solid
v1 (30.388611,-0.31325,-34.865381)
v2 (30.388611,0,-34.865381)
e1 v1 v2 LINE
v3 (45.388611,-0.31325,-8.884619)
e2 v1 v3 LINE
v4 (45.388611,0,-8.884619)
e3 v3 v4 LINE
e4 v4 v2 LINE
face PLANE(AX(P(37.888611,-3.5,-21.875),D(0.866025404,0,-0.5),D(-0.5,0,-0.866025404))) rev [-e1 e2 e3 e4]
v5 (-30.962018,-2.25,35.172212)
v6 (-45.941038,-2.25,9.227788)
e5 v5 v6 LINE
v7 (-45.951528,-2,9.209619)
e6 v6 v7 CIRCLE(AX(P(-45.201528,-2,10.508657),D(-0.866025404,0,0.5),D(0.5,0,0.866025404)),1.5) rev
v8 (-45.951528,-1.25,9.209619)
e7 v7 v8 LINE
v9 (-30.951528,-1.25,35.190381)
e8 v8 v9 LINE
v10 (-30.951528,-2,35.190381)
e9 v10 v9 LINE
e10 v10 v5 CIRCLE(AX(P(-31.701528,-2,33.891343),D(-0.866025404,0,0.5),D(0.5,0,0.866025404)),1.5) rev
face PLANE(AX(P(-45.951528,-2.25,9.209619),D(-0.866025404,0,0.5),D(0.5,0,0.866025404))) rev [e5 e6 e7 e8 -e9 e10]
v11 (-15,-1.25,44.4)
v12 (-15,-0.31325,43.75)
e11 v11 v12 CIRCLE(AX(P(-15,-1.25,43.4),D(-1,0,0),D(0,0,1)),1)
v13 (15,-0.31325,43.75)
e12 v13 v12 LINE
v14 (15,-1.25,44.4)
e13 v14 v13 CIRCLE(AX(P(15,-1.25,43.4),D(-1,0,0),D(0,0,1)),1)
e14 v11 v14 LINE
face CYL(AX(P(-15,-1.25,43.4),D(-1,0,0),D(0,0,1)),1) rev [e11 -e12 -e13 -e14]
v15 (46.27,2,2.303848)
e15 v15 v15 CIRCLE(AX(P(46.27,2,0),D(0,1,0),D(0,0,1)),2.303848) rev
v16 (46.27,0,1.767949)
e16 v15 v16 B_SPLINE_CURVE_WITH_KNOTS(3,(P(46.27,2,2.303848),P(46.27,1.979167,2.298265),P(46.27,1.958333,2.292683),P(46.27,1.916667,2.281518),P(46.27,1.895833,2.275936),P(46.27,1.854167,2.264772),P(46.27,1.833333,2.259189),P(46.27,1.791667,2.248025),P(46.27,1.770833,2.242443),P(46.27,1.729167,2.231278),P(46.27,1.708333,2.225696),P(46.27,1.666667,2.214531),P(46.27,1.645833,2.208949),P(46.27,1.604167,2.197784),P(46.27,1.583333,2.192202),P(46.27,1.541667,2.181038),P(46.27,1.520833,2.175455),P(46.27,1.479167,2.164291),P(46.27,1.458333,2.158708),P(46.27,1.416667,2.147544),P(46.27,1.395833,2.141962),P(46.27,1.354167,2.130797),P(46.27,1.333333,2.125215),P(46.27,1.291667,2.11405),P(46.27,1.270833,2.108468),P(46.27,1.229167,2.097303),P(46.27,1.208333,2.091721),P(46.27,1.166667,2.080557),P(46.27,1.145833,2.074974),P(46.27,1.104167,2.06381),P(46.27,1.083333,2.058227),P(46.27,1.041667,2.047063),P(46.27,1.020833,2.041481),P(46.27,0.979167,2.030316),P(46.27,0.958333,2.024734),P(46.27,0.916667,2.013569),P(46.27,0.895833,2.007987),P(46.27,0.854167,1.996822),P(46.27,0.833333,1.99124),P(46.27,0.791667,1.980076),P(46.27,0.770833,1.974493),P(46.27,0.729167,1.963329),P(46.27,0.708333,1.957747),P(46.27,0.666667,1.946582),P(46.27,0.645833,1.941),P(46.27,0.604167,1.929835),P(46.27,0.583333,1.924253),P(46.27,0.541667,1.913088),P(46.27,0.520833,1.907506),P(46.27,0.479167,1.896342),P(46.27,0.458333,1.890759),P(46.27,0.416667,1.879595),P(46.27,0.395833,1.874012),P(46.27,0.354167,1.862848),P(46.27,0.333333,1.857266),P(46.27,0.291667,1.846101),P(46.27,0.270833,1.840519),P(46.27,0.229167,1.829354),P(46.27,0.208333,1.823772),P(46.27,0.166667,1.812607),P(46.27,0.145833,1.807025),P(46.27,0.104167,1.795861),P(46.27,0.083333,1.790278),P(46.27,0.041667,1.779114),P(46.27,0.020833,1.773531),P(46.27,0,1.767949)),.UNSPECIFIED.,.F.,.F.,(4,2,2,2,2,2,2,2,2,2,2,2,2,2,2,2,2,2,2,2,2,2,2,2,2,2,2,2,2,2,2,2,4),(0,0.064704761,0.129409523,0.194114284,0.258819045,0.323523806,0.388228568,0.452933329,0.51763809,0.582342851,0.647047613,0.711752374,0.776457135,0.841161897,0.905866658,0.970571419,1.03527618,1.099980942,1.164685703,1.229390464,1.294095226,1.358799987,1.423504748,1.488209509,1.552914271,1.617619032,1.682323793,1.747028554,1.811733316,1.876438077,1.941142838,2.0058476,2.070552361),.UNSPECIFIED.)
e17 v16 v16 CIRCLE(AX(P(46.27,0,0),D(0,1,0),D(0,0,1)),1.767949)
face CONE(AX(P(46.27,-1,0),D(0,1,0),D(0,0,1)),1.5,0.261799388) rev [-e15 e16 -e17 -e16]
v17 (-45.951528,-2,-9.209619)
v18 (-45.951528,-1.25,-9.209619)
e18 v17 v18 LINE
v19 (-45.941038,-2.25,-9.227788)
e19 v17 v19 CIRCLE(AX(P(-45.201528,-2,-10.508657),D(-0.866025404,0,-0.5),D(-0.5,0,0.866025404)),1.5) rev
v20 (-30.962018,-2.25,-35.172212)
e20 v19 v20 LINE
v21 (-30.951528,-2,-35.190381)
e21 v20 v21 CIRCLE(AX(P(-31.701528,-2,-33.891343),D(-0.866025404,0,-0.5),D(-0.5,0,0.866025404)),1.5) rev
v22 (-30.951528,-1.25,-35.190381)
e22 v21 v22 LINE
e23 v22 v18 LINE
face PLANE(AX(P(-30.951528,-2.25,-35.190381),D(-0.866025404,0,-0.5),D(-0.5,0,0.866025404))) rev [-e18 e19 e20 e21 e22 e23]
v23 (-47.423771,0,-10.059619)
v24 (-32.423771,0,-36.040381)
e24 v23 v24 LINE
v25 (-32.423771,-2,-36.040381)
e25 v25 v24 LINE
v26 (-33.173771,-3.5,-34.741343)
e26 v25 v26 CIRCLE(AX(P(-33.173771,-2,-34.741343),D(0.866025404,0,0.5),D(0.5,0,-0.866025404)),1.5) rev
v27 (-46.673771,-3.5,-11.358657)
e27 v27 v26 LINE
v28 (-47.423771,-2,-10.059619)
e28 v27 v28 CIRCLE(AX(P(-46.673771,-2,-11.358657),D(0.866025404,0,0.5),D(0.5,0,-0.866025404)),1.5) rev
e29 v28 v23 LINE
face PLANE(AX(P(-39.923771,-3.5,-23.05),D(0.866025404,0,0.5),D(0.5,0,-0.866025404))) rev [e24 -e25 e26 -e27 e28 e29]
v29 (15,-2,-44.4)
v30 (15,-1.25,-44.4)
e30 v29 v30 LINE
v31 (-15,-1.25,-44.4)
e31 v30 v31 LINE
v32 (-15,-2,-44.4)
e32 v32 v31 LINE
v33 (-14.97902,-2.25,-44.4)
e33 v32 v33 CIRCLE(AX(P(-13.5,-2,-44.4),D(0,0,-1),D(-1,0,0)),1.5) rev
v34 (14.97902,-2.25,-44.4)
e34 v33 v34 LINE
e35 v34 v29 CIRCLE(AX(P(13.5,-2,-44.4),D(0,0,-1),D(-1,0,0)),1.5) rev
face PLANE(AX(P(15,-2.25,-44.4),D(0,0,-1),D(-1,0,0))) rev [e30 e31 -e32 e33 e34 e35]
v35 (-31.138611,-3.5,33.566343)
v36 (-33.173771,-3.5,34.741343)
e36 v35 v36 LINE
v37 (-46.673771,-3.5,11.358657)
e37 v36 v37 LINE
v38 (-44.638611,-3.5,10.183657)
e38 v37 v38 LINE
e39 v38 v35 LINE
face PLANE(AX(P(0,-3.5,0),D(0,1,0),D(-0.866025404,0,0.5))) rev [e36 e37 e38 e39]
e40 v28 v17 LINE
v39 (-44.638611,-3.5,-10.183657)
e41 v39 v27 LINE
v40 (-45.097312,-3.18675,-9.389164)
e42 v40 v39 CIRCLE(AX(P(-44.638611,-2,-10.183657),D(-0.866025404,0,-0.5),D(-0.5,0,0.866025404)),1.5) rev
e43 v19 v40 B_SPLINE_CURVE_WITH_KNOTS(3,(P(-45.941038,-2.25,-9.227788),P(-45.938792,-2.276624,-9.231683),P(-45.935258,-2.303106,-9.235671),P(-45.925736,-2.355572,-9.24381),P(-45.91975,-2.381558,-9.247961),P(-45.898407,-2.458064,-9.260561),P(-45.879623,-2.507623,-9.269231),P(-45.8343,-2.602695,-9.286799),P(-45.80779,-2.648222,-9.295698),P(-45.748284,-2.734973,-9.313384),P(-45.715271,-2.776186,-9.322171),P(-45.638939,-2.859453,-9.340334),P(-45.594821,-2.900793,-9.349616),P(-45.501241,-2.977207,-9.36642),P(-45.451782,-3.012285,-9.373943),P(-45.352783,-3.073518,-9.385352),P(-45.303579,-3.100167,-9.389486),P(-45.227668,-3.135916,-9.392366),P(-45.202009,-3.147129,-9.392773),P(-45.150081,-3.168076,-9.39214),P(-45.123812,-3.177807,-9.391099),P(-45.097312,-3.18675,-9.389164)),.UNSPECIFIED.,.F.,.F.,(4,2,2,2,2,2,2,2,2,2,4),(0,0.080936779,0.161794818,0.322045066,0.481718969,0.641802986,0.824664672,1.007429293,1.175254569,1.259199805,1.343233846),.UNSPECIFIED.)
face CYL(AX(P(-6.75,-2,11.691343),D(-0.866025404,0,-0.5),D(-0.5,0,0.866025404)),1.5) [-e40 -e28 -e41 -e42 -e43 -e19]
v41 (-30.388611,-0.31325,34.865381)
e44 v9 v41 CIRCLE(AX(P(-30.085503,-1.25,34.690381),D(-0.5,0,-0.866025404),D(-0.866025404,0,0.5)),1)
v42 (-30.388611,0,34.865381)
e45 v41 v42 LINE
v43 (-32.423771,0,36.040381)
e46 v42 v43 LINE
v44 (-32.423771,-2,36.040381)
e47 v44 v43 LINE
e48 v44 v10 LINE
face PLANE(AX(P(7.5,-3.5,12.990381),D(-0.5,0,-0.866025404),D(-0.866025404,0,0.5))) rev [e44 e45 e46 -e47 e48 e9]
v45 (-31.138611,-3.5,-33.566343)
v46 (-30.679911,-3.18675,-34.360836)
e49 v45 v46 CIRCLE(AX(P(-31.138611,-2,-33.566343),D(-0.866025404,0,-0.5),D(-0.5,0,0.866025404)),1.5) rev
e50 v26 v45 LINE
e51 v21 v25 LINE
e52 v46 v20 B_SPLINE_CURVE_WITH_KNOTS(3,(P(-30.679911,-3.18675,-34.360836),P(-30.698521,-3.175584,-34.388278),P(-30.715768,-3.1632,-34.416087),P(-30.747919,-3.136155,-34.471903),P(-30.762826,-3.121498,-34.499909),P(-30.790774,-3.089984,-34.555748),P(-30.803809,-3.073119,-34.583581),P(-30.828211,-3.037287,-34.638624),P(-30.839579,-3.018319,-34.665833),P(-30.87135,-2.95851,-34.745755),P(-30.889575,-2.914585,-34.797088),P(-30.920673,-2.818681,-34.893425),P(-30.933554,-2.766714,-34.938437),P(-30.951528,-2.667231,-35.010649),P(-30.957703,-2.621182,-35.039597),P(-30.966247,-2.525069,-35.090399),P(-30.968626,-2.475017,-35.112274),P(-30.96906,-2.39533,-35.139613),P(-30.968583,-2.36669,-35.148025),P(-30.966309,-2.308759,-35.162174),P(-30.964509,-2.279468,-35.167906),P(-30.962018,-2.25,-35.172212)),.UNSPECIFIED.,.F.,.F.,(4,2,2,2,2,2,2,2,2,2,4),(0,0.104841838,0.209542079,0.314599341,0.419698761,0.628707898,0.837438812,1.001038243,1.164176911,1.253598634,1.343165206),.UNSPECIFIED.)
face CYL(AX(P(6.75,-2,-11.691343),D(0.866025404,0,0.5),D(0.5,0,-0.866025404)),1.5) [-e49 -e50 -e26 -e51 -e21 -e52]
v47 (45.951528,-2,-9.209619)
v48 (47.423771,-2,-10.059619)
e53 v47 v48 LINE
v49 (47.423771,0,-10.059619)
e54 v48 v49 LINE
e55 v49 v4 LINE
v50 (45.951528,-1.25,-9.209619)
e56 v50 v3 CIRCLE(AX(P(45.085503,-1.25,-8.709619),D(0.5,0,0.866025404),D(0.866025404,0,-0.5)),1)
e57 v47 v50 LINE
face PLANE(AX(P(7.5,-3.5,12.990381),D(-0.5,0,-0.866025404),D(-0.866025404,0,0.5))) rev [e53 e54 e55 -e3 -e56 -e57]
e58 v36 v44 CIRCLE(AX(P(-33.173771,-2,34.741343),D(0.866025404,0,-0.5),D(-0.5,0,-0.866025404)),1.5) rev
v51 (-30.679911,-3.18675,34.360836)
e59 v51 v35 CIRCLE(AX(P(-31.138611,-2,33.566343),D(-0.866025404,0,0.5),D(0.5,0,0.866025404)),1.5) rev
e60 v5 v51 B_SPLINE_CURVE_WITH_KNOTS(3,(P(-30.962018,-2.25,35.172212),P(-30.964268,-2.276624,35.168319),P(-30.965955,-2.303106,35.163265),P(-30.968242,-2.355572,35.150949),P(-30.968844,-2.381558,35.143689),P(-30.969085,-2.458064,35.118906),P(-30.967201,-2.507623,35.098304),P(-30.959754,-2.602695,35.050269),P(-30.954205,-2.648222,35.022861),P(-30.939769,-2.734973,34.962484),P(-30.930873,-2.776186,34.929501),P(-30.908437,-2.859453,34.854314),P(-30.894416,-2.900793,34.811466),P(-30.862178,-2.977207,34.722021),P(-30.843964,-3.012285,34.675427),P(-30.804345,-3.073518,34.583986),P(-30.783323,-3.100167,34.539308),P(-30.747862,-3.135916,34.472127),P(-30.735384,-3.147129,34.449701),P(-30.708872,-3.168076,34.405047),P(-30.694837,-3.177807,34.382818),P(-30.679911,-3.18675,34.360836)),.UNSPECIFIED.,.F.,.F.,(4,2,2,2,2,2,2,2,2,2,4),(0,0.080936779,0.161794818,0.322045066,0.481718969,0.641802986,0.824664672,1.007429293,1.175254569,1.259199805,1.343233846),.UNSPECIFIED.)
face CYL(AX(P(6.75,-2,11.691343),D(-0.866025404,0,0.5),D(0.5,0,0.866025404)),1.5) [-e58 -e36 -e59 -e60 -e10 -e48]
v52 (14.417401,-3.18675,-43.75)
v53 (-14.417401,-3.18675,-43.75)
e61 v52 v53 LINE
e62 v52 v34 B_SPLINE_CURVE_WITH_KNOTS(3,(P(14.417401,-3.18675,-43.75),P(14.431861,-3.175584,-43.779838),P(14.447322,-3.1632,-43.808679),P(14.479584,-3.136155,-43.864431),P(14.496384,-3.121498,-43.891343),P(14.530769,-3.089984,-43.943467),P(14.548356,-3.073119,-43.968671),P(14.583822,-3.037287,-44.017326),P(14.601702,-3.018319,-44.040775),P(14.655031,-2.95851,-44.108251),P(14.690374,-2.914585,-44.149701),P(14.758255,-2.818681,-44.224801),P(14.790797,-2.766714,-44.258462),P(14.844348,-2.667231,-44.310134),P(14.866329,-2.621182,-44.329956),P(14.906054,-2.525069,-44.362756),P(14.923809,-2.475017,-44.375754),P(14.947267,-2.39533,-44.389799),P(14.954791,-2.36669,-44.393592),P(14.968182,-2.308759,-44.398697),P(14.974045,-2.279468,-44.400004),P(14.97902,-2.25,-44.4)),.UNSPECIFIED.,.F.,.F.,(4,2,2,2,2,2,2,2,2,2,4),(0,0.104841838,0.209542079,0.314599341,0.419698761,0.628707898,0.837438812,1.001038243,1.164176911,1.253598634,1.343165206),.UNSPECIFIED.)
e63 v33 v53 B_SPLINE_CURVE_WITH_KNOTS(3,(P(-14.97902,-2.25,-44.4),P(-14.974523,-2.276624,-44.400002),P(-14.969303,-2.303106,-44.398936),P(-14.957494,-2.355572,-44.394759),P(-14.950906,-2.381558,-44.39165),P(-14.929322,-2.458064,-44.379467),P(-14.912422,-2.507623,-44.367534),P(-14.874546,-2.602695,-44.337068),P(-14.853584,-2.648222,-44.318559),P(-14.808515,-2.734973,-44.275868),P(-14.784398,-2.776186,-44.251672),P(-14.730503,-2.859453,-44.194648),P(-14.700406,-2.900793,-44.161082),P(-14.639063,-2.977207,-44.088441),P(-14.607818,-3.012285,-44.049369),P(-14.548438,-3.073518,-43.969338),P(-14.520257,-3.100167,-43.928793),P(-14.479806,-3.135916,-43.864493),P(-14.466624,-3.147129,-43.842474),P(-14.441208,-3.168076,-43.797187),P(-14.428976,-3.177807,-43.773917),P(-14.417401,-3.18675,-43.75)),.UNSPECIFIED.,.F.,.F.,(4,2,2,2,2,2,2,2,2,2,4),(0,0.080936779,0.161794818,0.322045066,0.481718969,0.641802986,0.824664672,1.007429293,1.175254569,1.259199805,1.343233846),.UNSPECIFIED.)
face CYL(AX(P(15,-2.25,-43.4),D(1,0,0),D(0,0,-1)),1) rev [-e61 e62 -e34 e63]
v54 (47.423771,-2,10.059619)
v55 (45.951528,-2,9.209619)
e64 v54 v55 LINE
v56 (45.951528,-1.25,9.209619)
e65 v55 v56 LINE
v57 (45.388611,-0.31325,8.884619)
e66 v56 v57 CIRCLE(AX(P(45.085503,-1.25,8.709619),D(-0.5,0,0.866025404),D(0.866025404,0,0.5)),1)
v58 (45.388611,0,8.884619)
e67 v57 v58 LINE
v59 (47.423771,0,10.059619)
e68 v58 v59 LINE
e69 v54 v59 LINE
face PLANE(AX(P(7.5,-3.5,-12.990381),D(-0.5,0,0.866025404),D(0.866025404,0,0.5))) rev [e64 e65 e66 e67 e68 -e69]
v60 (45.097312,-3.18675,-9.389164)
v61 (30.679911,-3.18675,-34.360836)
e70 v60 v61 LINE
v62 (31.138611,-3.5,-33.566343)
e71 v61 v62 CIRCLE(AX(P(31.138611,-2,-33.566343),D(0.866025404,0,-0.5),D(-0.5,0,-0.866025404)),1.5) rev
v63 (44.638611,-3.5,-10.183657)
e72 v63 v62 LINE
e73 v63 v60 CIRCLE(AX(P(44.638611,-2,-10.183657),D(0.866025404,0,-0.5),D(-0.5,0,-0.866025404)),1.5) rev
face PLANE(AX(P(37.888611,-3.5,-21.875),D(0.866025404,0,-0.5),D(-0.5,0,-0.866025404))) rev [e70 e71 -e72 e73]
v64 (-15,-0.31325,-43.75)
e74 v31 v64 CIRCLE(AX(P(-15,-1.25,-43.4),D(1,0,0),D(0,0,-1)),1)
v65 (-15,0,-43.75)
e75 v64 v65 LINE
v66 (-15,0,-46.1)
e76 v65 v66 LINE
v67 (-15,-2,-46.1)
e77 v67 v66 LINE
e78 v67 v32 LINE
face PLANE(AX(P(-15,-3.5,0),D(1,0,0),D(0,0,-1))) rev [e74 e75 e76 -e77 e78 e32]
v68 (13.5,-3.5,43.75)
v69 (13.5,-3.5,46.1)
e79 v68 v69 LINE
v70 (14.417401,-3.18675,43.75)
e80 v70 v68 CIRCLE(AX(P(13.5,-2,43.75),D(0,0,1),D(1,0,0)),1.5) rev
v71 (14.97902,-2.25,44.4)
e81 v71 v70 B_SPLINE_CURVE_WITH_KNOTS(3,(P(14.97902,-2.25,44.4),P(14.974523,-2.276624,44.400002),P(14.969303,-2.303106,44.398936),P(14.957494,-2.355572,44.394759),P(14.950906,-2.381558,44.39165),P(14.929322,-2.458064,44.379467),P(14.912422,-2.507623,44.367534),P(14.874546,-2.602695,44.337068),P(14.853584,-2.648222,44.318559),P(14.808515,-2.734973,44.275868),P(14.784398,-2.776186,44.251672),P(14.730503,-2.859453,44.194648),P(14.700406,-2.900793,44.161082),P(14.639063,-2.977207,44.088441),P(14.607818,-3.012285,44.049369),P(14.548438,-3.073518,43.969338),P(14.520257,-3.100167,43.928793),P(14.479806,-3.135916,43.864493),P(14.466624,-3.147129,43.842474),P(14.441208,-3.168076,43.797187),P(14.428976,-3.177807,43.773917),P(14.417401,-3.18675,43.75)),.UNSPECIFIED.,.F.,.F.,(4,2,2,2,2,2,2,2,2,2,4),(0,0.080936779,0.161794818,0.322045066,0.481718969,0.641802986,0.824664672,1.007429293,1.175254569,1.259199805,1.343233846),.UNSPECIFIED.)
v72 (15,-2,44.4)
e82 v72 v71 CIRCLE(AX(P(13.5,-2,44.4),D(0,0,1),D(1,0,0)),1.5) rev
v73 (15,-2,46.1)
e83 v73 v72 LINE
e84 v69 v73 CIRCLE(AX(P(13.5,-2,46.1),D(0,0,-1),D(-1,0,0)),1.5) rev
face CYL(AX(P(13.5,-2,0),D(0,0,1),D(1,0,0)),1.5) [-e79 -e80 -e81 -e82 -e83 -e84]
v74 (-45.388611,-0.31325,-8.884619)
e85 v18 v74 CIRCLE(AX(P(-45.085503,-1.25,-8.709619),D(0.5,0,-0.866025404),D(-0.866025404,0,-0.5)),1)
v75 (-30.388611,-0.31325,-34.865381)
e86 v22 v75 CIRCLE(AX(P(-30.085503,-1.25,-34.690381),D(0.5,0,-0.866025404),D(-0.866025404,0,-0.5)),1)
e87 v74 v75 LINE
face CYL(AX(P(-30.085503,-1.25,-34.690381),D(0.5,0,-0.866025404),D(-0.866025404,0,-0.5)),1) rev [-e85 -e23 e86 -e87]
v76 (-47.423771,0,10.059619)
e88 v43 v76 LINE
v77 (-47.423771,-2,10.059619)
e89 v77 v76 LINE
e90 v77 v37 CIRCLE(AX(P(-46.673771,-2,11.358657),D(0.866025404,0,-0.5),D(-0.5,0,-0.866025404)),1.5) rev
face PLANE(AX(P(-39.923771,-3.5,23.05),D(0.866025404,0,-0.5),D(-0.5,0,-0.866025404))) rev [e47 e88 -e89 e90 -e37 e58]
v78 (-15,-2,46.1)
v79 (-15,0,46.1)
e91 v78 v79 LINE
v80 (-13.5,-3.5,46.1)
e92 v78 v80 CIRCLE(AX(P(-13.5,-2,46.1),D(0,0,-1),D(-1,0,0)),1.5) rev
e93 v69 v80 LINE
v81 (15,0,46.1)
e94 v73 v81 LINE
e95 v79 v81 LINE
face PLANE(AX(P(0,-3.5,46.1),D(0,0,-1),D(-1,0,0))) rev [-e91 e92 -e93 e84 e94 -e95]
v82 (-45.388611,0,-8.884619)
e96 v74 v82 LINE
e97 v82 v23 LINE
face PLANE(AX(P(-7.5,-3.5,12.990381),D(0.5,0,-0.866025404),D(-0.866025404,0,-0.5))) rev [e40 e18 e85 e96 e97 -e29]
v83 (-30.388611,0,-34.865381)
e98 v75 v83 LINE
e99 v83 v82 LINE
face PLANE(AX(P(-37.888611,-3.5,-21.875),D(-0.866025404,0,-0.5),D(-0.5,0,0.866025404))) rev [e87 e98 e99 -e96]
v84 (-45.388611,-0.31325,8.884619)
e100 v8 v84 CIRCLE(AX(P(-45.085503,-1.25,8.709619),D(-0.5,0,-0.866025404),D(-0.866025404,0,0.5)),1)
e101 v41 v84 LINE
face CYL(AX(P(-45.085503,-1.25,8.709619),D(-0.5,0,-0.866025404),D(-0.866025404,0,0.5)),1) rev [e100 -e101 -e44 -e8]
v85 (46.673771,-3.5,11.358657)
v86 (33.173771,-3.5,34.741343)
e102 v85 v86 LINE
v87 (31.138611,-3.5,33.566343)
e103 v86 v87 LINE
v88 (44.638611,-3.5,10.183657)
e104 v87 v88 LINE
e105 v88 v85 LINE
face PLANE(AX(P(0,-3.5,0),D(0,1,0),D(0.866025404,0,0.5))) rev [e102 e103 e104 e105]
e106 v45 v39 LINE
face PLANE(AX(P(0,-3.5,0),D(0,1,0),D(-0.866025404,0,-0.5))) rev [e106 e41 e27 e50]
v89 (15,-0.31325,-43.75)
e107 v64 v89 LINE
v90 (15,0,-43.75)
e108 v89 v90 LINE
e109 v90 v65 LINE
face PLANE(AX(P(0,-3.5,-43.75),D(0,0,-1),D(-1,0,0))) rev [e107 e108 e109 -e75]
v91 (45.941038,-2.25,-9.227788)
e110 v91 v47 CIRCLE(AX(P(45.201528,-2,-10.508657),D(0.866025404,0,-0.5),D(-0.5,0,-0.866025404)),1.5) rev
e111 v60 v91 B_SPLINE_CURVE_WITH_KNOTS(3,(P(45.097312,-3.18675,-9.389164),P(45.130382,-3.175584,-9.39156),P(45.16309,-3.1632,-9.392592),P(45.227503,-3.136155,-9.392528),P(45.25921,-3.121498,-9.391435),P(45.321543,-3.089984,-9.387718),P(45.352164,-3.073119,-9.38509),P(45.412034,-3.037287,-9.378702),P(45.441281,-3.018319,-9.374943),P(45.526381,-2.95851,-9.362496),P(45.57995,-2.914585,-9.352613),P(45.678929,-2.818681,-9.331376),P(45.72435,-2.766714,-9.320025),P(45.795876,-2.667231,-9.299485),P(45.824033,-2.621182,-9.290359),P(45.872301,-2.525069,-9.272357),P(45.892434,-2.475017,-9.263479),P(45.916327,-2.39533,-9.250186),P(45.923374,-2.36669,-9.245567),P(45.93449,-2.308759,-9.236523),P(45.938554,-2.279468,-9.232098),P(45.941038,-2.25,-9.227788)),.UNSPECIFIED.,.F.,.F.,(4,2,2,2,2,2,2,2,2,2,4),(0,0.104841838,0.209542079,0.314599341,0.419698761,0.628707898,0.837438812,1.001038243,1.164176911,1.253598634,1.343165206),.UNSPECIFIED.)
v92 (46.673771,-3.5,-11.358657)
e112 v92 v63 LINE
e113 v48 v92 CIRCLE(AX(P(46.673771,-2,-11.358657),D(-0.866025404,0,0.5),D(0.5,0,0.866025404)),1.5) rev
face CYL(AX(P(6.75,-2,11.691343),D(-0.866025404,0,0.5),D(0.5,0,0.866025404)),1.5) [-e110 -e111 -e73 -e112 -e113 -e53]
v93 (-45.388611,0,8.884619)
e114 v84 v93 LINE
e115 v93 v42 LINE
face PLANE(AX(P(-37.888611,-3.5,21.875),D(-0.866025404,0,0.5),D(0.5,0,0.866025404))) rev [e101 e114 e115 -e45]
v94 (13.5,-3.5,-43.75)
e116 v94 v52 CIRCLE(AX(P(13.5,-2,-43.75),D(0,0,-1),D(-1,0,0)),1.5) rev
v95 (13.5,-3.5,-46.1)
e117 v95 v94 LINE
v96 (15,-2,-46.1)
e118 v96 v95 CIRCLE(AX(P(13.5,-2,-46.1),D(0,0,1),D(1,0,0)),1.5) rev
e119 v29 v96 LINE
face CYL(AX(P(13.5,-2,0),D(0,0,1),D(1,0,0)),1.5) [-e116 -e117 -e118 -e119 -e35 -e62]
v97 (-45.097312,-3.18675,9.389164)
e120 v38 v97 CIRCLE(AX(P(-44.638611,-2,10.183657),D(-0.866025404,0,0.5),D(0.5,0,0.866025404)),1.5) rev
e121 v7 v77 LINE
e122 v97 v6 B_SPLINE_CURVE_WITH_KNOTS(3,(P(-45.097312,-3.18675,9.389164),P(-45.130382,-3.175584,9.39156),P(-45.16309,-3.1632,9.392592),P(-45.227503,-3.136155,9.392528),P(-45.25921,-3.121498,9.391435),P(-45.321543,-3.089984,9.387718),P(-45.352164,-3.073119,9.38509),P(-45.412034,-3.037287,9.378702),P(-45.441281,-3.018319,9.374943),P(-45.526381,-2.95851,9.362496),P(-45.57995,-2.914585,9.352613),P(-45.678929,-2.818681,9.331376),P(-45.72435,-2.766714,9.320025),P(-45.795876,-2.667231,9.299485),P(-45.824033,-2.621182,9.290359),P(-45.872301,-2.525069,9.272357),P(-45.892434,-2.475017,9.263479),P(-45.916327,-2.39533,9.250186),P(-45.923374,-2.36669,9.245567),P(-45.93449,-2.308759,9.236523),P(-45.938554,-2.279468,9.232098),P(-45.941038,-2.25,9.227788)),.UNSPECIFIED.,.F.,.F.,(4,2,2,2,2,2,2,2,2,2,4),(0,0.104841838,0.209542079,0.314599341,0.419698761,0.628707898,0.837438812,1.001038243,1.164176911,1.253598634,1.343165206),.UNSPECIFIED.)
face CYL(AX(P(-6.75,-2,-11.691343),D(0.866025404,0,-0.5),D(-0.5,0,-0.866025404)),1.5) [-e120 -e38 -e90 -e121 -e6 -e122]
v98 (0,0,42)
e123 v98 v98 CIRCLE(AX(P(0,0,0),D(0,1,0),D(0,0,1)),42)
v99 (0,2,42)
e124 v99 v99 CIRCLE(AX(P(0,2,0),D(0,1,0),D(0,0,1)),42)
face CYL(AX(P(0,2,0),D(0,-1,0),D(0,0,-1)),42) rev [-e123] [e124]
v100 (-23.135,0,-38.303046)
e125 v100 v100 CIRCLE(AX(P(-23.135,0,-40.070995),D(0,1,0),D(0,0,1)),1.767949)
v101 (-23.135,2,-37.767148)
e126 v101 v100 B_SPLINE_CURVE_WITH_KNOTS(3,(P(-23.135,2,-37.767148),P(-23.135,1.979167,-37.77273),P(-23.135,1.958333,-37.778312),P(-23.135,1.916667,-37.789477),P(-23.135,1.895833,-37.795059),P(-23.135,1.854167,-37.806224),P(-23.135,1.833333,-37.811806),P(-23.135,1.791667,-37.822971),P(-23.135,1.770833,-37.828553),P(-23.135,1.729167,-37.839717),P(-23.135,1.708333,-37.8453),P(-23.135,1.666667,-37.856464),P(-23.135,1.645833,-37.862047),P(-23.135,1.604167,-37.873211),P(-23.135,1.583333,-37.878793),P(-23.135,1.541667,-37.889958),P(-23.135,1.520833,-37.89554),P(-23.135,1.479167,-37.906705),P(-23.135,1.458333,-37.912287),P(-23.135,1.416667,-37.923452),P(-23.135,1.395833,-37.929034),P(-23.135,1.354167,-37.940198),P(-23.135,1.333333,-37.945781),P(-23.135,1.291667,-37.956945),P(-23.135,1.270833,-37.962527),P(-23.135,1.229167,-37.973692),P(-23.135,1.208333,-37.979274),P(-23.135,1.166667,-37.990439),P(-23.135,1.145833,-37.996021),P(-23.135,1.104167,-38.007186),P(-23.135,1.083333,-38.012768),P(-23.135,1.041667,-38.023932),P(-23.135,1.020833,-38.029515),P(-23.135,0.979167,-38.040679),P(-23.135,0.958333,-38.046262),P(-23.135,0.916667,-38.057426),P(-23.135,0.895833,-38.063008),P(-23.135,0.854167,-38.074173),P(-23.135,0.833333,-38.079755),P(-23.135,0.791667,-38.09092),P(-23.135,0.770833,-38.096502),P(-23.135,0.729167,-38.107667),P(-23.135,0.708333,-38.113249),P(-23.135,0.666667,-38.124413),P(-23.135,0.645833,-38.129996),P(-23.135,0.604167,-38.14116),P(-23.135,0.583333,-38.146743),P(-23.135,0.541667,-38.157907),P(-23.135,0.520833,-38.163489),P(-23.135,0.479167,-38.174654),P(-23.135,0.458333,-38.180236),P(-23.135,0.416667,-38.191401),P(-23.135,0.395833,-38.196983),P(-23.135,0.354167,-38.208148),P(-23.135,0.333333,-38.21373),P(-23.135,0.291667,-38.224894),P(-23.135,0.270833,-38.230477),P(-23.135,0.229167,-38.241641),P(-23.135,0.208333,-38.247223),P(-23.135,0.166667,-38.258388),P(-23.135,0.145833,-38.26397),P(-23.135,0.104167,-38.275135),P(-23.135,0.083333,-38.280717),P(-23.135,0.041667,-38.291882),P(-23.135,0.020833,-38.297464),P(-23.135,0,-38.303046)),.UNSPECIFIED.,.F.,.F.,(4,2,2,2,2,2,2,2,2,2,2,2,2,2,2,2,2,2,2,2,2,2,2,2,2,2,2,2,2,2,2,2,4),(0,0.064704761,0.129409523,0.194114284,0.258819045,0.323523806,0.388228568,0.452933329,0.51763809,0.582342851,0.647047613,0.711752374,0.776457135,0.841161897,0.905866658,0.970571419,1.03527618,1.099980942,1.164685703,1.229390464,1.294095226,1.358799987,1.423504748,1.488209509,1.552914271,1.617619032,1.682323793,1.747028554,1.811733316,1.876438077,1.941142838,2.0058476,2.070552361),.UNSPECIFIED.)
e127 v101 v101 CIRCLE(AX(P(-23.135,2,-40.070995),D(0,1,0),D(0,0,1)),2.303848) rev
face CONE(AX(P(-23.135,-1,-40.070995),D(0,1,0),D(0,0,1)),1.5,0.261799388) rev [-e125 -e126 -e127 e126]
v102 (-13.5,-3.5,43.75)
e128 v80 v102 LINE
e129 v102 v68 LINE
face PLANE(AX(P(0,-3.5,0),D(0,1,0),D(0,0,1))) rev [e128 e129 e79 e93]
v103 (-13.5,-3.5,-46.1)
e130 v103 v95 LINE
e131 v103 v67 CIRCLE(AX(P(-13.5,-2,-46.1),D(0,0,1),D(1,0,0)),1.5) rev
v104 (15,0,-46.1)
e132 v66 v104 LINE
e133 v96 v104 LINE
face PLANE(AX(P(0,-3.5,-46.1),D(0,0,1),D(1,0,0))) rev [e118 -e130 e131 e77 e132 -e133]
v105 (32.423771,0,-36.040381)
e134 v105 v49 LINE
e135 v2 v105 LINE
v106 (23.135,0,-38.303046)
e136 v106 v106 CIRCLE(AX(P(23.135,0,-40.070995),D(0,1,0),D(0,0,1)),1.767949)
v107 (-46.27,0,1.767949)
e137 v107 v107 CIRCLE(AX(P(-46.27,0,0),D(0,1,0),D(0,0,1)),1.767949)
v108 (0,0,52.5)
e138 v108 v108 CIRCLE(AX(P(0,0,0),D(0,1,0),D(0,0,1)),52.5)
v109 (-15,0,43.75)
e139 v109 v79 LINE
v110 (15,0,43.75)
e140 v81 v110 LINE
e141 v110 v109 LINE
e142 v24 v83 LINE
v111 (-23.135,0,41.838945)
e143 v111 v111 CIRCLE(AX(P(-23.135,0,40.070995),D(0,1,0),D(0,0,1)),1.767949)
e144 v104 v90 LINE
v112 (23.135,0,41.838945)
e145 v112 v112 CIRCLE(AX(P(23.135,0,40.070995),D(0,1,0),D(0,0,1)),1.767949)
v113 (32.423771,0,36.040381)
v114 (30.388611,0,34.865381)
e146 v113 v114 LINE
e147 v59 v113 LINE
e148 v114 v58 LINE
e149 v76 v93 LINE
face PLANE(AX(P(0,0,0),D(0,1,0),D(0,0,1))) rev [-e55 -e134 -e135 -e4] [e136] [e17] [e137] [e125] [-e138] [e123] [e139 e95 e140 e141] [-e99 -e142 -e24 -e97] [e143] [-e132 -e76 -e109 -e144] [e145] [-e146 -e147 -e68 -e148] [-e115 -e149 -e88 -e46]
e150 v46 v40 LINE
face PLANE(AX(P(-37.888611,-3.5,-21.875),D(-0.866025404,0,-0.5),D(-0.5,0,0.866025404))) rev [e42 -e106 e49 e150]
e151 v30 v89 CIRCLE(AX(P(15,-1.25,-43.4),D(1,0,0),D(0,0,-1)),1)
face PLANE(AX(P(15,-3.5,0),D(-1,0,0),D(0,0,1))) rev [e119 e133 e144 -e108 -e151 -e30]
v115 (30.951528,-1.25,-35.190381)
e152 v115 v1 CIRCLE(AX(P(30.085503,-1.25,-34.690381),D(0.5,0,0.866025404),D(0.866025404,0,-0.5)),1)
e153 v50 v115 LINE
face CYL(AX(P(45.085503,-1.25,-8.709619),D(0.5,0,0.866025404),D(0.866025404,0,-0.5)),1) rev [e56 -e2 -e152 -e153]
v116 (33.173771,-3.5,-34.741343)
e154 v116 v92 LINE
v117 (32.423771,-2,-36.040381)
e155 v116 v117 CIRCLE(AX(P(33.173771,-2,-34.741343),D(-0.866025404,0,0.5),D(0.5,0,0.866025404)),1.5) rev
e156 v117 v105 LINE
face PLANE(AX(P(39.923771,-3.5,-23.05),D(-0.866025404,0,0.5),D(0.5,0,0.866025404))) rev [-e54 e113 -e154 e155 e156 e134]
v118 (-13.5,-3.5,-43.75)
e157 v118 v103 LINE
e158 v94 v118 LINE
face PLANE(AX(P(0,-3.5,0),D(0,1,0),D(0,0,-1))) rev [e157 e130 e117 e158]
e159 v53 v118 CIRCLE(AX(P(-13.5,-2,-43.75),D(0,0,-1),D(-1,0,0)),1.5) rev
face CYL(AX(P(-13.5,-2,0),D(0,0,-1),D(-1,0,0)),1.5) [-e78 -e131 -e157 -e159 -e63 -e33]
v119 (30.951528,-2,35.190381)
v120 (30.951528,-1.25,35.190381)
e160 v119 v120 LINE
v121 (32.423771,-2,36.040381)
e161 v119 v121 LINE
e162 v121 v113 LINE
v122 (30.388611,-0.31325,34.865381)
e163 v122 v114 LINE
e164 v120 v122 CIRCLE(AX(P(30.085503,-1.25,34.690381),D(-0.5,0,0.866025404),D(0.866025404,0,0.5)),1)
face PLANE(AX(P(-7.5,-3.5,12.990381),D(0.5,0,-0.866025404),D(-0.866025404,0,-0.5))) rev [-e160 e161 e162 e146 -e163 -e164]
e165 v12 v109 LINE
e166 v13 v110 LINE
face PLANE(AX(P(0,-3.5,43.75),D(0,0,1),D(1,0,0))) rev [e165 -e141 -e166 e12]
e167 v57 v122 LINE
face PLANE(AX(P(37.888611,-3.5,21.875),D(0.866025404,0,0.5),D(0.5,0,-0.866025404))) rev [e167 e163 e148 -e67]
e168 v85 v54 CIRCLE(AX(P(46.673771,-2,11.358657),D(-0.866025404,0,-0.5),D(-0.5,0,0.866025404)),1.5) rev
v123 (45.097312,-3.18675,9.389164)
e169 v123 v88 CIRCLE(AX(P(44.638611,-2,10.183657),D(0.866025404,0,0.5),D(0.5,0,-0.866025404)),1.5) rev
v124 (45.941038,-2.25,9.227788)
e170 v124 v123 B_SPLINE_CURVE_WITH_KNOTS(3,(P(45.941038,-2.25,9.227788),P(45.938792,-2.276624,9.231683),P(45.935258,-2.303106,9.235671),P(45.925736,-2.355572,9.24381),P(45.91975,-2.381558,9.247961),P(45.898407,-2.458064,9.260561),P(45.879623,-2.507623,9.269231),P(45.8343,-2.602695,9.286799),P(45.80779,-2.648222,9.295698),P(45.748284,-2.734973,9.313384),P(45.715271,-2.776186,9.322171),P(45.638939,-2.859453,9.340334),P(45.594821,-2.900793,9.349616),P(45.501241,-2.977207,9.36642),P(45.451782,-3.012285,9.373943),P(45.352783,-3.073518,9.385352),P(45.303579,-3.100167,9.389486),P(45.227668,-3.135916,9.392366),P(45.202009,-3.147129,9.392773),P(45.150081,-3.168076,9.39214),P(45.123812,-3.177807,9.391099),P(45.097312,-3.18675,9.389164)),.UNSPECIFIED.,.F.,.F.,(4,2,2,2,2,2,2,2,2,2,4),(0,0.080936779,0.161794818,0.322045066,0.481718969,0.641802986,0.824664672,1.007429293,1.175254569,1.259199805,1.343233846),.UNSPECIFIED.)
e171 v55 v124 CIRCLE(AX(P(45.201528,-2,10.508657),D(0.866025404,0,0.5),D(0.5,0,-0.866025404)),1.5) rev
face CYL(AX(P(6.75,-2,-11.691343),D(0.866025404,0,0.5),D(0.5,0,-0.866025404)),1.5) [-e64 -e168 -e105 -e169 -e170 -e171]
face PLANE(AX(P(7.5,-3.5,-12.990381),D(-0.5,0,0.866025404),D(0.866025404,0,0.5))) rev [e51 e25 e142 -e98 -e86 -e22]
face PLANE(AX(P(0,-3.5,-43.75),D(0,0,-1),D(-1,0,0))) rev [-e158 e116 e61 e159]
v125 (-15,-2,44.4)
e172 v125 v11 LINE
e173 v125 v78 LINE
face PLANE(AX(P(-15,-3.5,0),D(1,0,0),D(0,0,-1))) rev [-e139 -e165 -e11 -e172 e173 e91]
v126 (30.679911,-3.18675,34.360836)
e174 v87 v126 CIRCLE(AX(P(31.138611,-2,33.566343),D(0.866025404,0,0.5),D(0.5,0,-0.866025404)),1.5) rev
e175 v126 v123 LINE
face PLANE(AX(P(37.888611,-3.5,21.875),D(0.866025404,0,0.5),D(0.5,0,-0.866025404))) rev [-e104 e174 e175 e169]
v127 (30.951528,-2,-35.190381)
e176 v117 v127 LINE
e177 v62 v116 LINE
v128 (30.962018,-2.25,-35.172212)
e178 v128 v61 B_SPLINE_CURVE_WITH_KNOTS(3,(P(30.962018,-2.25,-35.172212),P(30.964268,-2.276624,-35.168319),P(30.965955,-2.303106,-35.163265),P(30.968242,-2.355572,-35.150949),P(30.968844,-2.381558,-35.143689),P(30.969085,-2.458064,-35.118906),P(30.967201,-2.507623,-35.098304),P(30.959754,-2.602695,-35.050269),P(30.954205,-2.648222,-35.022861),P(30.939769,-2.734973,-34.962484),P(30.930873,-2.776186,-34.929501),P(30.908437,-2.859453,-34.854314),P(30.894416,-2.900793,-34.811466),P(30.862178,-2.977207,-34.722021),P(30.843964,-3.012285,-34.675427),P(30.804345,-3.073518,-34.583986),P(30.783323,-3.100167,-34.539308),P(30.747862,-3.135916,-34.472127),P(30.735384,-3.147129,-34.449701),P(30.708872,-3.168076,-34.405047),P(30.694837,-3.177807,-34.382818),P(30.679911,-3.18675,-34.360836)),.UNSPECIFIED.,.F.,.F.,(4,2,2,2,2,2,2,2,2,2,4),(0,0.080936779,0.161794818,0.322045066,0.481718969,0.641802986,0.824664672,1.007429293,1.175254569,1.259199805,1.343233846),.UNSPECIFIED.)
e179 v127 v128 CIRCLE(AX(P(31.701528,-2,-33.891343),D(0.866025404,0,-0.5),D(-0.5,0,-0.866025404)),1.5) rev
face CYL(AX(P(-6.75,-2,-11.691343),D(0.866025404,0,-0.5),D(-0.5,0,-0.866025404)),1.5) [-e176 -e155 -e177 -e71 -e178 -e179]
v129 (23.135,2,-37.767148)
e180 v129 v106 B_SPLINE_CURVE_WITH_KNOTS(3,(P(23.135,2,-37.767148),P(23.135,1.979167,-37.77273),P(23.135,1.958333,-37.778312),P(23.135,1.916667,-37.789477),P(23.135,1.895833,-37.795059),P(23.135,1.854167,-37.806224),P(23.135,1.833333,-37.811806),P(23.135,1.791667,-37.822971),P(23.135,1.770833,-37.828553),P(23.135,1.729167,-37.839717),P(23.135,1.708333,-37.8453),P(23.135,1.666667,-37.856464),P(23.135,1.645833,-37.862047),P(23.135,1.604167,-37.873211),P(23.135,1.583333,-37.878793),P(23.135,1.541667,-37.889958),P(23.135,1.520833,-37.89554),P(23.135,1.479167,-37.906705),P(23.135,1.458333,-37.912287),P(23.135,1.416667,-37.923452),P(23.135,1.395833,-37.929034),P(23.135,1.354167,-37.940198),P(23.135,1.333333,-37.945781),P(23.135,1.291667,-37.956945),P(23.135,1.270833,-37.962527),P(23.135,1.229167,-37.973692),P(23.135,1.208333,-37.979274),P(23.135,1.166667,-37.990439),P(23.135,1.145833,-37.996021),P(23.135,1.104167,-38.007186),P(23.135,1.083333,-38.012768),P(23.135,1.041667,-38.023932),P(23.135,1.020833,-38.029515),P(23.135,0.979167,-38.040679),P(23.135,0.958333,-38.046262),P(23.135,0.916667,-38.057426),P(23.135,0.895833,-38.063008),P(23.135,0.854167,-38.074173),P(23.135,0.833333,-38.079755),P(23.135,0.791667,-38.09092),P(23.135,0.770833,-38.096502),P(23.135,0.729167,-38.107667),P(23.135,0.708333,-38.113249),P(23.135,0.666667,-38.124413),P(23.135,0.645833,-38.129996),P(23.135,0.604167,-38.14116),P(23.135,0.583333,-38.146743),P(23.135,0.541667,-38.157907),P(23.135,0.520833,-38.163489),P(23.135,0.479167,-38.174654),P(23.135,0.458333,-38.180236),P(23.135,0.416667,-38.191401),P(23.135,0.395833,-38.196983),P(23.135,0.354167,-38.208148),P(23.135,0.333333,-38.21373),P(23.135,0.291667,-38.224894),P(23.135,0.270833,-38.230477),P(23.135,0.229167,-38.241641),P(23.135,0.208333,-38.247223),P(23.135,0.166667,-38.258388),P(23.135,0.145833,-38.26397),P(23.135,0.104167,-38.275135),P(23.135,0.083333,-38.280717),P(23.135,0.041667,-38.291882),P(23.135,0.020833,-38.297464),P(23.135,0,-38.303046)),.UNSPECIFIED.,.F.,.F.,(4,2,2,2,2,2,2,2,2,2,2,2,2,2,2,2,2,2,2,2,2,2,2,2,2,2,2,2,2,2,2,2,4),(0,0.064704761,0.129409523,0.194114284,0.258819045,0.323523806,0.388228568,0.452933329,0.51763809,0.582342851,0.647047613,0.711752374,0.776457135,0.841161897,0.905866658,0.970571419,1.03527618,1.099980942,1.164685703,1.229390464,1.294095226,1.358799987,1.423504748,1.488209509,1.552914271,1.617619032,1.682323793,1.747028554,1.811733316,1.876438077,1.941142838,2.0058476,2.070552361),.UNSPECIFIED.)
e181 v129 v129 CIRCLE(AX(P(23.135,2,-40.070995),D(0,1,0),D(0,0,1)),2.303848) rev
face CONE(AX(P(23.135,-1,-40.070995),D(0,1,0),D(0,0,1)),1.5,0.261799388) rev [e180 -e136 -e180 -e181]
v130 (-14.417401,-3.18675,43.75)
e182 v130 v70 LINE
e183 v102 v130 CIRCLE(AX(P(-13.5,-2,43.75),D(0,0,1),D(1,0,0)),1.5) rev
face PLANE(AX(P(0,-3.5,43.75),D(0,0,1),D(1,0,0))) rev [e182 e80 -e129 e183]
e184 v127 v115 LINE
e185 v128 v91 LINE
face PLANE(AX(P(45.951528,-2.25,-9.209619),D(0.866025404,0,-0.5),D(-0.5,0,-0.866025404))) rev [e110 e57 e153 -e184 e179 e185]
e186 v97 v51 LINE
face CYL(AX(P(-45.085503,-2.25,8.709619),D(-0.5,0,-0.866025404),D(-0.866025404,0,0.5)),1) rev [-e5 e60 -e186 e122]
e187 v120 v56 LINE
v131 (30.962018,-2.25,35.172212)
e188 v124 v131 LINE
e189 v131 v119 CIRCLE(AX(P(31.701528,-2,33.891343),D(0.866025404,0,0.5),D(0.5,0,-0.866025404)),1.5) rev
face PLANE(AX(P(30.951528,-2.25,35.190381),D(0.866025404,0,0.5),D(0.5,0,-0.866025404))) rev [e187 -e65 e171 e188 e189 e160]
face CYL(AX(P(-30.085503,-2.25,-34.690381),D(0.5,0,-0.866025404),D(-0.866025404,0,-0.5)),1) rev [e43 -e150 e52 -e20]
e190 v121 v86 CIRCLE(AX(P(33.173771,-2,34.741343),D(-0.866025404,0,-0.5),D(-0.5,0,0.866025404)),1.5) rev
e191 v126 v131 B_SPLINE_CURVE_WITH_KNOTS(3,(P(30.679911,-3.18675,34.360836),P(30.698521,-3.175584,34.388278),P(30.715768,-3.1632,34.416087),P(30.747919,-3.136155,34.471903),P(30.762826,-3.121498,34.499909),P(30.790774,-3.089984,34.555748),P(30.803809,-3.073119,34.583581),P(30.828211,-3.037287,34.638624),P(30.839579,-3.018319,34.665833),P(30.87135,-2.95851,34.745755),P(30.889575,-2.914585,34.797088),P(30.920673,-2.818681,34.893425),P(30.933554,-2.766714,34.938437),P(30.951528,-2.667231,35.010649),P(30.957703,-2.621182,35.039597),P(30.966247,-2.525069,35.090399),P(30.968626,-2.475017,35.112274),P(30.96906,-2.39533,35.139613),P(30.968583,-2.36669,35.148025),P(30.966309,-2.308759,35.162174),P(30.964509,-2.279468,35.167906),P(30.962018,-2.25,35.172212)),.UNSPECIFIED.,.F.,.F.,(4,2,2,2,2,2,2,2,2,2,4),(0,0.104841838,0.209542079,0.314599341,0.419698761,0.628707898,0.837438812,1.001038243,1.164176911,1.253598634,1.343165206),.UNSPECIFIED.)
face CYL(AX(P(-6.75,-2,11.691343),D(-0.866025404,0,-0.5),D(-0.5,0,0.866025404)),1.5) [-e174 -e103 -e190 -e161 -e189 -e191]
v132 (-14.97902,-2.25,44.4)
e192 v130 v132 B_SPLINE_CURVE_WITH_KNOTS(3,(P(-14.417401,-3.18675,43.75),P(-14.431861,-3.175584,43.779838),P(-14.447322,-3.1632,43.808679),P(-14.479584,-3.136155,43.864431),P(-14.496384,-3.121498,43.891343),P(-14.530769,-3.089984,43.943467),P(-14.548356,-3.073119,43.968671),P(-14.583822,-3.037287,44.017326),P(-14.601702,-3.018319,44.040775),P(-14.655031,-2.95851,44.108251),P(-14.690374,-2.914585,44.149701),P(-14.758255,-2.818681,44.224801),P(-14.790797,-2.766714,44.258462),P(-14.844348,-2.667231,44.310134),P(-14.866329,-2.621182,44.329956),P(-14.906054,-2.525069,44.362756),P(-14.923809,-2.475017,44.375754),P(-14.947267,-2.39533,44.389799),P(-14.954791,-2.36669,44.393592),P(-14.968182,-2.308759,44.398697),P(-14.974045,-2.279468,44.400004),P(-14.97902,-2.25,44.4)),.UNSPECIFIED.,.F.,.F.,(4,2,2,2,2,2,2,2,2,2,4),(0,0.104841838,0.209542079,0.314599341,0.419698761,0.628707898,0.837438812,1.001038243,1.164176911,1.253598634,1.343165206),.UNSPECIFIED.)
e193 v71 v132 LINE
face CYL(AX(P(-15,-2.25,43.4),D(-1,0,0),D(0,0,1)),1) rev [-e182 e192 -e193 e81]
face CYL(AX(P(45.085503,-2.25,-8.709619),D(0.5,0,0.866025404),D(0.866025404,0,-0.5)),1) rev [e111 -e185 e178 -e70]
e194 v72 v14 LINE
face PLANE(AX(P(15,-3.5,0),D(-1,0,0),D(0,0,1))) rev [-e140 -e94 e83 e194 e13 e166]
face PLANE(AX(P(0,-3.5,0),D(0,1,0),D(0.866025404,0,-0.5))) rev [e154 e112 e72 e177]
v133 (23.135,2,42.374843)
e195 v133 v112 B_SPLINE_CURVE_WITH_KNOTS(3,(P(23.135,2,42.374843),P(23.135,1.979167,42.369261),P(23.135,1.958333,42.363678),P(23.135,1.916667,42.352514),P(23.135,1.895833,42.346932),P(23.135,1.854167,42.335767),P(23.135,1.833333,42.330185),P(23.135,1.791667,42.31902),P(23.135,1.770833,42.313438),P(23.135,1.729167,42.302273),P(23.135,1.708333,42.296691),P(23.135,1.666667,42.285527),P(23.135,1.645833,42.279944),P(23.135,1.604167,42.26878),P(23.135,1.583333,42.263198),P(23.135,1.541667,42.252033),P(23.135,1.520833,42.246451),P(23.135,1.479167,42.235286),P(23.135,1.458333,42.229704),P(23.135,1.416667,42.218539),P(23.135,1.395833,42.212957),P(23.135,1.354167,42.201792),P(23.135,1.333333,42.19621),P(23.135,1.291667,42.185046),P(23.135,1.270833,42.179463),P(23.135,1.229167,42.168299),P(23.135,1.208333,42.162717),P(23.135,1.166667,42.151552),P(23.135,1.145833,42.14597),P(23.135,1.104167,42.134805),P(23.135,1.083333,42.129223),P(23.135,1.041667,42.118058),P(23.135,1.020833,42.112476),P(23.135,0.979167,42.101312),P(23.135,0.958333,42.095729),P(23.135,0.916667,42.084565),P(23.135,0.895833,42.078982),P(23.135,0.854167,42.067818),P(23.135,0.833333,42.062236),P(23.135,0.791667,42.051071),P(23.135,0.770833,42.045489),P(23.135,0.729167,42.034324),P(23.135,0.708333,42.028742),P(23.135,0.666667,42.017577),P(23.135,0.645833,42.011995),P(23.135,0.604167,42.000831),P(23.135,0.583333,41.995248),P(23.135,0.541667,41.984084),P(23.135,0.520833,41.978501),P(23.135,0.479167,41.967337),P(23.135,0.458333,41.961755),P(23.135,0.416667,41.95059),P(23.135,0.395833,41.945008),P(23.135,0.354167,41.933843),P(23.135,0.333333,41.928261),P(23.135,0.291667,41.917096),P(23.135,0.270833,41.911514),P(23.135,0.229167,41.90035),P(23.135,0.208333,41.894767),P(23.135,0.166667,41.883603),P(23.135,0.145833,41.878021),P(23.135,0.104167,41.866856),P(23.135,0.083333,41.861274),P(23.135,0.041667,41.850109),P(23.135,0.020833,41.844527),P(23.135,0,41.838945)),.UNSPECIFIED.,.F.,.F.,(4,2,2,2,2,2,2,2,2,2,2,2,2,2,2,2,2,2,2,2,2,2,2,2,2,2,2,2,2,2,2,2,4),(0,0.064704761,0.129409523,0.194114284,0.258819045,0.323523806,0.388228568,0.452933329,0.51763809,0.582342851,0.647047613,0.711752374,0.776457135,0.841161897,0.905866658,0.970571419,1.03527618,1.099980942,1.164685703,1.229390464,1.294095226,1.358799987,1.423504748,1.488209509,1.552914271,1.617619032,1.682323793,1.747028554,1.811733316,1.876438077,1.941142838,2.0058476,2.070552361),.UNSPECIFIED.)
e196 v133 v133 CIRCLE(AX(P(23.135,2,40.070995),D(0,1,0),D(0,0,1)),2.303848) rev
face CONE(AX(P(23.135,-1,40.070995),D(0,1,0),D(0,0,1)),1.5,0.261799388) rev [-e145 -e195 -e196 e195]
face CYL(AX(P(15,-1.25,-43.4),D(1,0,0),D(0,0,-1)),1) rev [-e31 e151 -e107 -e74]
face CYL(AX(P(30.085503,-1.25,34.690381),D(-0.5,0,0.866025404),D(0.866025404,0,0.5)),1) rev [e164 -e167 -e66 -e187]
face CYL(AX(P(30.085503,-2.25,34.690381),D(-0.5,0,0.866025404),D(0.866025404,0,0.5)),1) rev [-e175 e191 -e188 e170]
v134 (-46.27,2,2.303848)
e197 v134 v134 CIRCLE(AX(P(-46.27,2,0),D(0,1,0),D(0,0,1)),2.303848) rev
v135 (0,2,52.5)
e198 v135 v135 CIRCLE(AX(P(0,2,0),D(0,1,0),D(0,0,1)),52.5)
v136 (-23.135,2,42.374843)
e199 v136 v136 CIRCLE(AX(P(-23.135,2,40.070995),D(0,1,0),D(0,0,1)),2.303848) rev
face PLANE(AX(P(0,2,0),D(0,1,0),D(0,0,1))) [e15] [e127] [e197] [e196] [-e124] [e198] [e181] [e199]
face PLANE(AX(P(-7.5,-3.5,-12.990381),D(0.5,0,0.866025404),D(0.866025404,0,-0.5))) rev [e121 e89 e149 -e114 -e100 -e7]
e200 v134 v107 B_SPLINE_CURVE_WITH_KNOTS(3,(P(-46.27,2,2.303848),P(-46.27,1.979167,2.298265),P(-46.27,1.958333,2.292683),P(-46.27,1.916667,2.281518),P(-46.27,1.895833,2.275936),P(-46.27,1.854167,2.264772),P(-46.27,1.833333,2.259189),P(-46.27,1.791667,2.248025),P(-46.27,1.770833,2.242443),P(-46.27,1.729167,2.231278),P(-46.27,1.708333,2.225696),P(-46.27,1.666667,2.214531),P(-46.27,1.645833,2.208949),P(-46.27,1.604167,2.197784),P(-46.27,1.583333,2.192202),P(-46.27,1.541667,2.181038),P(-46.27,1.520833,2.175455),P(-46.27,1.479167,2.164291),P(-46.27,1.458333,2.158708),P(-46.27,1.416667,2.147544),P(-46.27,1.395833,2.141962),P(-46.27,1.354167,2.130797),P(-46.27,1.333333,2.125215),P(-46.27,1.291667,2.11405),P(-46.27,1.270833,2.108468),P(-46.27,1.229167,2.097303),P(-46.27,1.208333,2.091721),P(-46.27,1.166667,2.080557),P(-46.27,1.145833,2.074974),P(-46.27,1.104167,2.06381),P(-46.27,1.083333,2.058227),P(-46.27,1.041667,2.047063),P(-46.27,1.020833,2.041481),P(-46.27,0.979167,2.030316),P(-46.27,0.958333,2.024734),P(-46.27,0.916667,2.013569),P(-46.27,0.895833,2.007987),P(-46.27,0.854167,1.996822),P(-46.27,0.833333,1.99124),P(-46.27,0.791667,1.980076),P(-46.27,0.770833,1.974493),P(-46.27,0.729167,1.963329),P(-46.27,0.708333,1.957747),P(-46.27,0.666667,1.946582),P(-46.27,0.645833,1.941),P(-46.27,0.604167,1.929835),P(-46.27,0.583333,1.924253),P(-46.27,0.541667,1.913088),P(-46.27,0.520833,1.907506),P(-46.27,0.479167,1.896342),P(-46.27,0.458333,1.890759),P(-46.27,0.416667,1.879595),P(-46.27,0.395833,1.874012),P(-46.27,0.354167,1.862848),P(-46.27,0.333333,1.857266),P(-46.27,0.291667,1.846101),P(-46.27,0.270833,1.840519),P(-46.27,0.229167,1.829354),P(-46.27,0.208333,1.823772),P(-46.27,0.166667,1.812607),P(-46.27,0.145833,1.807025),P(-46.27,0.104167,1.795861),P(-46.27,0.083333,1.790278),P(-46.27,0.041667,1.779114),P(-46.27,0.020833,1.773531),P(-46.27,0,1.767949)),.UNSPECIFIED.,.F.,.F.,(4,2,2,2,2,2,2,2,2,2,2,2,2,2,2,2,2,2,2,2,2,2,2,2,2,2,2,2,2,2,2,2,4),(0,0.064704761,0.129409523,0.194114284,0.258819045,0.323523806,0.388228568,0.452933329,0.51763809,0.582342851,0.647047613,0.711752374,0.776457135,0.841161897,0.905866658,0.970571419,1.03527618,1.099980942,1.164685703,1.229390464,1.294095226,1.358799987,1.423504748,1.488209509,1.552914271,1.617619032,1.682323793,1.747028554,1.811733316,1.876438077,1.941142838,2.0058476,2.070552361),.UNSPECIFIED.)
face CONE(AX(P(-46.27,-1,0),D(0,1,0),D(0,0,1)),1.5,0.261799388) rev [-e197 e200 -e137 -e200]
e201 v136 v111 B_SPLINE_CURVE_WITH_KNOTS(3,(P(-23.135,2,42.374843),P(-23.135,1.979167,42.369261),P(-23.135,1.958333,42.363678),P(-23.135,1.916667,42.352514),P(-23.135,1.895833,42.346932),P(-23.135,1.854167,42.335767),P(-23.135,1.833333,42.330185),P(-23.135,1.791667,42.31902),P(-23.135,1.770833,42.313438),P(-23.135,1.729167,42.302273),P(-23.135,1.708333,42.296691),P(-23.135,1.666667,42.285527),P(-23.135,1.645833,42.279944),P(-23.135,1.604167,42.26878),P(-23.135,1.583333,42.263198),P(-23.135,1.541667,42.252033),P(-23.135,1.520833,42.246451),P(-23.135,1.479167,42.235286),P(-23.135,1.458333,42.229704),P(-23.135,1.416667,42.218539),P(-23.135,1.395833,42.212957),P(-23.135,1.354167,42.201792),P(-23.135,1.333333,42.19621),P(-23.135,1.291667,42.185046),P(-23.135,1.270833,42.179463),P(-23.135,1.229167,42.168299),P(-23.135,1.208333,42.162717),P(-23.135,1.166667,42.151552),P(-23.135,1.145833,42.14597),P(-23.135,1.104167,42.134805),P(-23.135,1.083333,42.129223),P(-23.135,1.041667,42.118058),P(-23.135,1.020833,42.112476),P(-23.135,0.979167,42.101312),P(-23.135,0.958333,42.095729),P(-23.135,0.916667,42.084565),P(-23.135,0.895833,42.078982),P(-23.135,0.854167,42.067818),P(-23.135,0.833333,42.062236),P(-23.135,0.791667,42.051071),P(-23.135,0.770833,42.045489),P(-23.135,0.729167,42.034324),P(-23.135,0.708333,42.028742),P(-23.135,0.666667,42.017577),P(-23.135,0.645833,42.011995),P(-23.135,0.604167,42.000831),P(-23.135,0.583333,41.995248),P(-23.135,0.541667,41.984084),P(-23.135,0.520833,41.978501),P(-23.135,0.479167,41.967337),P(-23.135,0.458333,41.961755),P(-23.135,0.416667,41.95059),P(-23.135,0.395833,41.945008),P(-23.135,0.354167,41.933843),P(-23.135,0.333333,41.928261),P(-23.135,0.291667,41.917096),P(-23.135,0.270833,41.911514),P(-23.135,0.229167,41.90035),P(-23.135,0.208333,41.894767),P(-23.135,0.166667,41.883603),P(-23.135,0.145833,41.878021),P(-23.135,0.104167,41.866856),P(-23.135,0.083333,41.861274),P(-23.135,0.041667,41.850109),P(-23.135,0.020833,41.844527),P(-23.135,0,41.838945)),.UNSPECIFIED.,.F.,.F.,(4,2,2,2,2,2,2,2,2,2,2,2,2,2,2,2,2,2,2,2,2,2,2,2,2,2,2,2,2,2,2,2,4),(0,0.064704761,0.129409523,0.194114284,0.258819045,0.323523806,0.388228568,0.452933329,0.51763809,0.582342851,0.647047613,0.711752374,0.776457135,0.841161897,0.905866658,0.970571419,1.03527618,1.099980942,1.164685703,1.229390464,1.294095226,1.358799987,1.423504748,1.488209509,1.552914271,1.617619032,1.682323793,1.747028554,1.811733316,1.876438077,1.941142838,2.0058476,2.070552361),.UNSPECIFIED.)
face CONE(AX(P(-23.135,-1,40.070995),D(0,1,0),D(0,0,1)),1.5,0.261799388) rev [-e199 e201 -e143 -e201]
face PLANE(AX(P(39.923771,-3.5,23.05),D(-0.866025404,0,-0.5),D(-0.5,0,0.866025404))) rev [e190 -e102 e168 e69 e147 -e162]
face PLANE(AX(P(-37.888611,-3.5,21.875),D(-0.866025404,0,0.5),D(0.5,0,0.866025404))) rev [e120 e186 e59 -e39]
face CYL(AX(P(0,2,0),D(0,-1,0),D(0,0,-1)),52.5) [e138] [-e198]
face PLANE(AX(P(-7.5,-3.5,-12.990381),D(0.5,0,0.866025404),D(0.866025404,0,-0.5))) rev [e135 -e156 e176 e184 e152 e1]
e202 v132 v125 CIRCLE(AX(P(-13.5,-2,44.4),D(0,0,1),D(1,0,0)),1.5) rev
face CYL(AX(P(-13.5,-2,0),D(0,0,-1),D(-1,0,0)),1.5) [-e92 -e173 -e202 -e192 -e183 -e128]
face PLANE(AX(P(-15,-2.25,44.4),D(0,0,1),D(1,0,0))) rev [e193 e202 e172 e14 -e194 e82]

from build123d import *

# Parameters (mm, degrees)
BOSS_EXTRUDE2_START       = -3.5
SKETCH1_W                 = 30
SKETCH1_H                 = 2.35
BOSS_EXTRUDE2_DEPTH       = 4.5
SKETCH3_R                 = 52.5
SKETCH3_R_2               = 42
SKETCH3_R_3               = 1.5
BOSS_EXTRUDE3_DEPTH       = 2
CHAMFER1_SIZE             = 3
CHAMFER1_SIZE_2           = 0.803847577
FILLET1_R                 = 1.5
F_1_0MM_START             = -15
F_1_0MM_DOWEL_SLOT1_DEPTH = 30
CIRPATTERN1_COUNT         = 6
FILLET1_OF_CIRPATTERN1_R  = 1.5


# Read off the part's stored shape, not the designer's step: Ø1.0mm Dowel Slot1
with BuildPart() as part:
    # Sketch1 → Boss-Extrude2 (new body)
    with BuildSketch(Plane(origin=(0, 0, 0), x_dir=(1, 0, 0), z_dir=(0, 1, 0)).offset(BOSS_EXTRUDE2_START)):
        with Locations((0, -44.925)):
            Rectangle(SKETCH1_W, SKETCH1_H)
    boss_extrude2 = extrude(amount=BOSS_EXTRUDE2_DEPTH)

    # Sketch3 → Boss-Extrude3 (add)
    with BuildSketch(Plane(origin=(0, 0, 0), x_dir=(1, 0, 0), z_dir=(0, 1, 0))):
        with Locations(Location((0, 0, 0), (0, 0, 270))):
            Circle(SKETCH3_R)
        with Locations(Location((0, 0, 0), (0, 0, 270))):
            Circle(SKETCH3_R_2, mode=Mode.SUBTRACT)
        with Locations(Location((-23.135, 40.070995433, 0), (0, 0, 270))):
            Circle(SKETCH3_R_3, mode=Mode.SUBTRACT)
        with Locations(Location((23.135, 40.070995433, 0), (0, 0, 270))):
            Circle(SKETCH3_R_3, mode=Mode.SUBTRACT)
        with Locations(Location((46.27, 0, 0), (0, 0, 270))):
            Circle(SKETCH3_R_3, mode=Mode.SUBTRACT)
        with Locations(Location((23.135, -40.070995433, 0), (0, 0, 270))):
            Circle(SKETCH3_R_3, mode=Mode.SUBTRACT)
        with Locations(Location((-23.135, -40.070995433, 0), (0, 0, 270))):
            Circle(SKETCH3_R_3, mode=Mode.SUBTRACT)
        with Locations(Location((-46.27, 0, 0), (0, 0, 270))):
            Circle(SKETCH3_R_3, mode=Mode.SUBTRACT)
    extrude(amount=BOSS_EXTRUDE3_DEPTH)

    # Chamfer1
    # the kernel refuses this chamfer: 3, 0.803847577 mm, written as the material it takes off along each edge
    with BuildSketch(Plane(origin=(23.135, 2, 40.070995433), x_dir=(0, 0, 1), z_dir=(-1, 0, 0))) as chamfer1_piece_1:
        Polygon((1.5, -CHAMFER1_SIZE), (1.5 + CHAMFER1_SIZE_2, 0), (1.5, 0), align=None)
    revolve(axis=Axis((23.135, 2, 40.070995433), (0, 1, 0)), mode=Mode.SUBTRACT)
    with BuildSketch(Plane(origin=(46.27, 2, 0), x_dir=(0, 0, 1), z_dir=(-1, 0, 0))) as chamfer1_piece_2:
        Polygon((1.5, -CHAMFER1_SIZE), (1.5 + CHAMFER1_SIZE_2, 0), (1.5, 0), align=None)
    revolve(axis=Axis((46.27, 2, 0), (0, 1, 0)), mode=Mode.SUBTRACT)
    with BuildSketch(Plane(origin=(23.135, 2, -40.070995433), x_dir=(0, 0, 1), z_dir=(-1, 0, 0))) as chamfer1_piece_3:
        Polygon((1.5, -CHAMFER1_SIZE), (1.5 + CHAMFER1_SIZE_2, 0), (1.5, 0), align=None)
    revolve(axis=Axis((23.135, 2, -40.070995433), (0, 1, 0)), mode=Mode.SUBTRACT)
    with BuildSketch(Plane(origin=(-23.135, 2, -40.070995433), x_dir=(0, 0, 1), z_dir=(-1, 0, 0))) as chamfer1_piece_4:
        Polygon((1.5, -CHAMFER1_SIZE), (1.5 + CHAMFER1_SIZE_2, 0), (1.5, 0), align=None)
    revolve(axis=Axis((-23.135, 2, -40.070995433), (0, 1, 0)), mode=Mode.SUBTRACT)
    with BuildSketch(Plane(origin=(-46.27, 2, 0), x_dir=(0, 0, 1), z_dir=(-1, 0, 0))) as chamfer1_piece_5:
        Polygon((1.5, -CHAMFER1_SIZE), (1.5 + CHAMFER1_SIZE_2, 0), (1.5, 0), align=None)
    revolve(axis=Axis((-46.27, 2, 0), (0, 1, 0)), mode=Mode.SUBTRACT)
    with BuildSketch(Plane(origin=(-23.135, 2, 40.070995433), x_dir=(0, 0, 1), z_dir=(-1, 0, 0))) as chamfer1_piece_6:
        Polygon((1.5, -CHAMFER1_SIZE), (1.5 + CHAMFER1_SIZE_2, 0), (1.5, 0), align=None)
    revolve(axis=Axis((-23.135, 2, 40.070995433), (0, 1, 0)), mode=Mode.SUBTRACT)

    # Fillet1
    fillet1_edges = [part.edges().sort_by_distance(p)[0] for p in [
        (-15, -3.5, 44.925),
        (15, -3.5, 44.925),
    ]]
    fillet(fillet1_edges, radius=FILLET1_R)

    # Ø1.0mm Dowel Slot1 outline → Ø1.0mm Dowel Slot1 (cut)
    with BuildSketch(Plane.YZ.offset(F_1_0MM_START)):
        with BuildLine():
            ThreePointArc((-0.3132503, 43.75), (-0.679912287, 44.221583836), (-1.25, 44.4))
            Line((-1.25, 44.4), (-2.25, 44.4))
            ThreePointArc((-2.25, 44.4), (-2.820087713, 44.221583836), (-3.1867497, 43.75))
            Line((-3.1867497, 43.75), (-0.3132503, 43.75))
        make_face()
    f_1_0mm_dowel_slot1 = extrude(amount=F_1_0MM_DOWEL_SLOT1_DEPTH, mode=Mode.SUBTRACT)

    # CirPattern1: Boss-Extrude2, Ø1.0mm Dowel Slot1 ×6 about axis
    cirpattern1_axis = Axis((0, 0, 0), (0, 1, 0))
    add([boss_extrude2.rotate(cirpattern1_axis, i * 360 / CIRPATTERN1_COUNT) for i in range(1, CIRPATTERN1_COUNT)])
    add([f_1_0mm_dowel_slot1.rotate(cirpattern1_axis, i * 360 / CIRPATTERN1_COUNT) for i in range(1, CIRPATTERN1_COUNT)], mode=Mode.SUBTRACT)

    # Fillet1 of CirPattern1
    fillet1_of_cirpattern1_edges = [part.edges().sort_by_distance(p)[0] for p in [
        (31.406191265, -3.5, 35.452881057),
        (46.406191265, -3.5, 9.472118943),
        (46.406191265, -3.5, -9.472118943),
        (31.406191265, -3.5, -35.452881057),
        (15, -3.5, -44.925),
        (-15, -3.5, -44.925),
        (-31.406191265, -3.5, -35.452881057),
        (-46.406191265, -3.5, -9.472118943),
        (-46.406191265, -3.5, 9.472118943),
        (-31.406191265, -3.5, 35.452881057),
    ]]
    fillet(fillet1_of_cirpattern1_edges, radius=FILLET1_OF_CIRPATTERN1_R)


solid = part.part
